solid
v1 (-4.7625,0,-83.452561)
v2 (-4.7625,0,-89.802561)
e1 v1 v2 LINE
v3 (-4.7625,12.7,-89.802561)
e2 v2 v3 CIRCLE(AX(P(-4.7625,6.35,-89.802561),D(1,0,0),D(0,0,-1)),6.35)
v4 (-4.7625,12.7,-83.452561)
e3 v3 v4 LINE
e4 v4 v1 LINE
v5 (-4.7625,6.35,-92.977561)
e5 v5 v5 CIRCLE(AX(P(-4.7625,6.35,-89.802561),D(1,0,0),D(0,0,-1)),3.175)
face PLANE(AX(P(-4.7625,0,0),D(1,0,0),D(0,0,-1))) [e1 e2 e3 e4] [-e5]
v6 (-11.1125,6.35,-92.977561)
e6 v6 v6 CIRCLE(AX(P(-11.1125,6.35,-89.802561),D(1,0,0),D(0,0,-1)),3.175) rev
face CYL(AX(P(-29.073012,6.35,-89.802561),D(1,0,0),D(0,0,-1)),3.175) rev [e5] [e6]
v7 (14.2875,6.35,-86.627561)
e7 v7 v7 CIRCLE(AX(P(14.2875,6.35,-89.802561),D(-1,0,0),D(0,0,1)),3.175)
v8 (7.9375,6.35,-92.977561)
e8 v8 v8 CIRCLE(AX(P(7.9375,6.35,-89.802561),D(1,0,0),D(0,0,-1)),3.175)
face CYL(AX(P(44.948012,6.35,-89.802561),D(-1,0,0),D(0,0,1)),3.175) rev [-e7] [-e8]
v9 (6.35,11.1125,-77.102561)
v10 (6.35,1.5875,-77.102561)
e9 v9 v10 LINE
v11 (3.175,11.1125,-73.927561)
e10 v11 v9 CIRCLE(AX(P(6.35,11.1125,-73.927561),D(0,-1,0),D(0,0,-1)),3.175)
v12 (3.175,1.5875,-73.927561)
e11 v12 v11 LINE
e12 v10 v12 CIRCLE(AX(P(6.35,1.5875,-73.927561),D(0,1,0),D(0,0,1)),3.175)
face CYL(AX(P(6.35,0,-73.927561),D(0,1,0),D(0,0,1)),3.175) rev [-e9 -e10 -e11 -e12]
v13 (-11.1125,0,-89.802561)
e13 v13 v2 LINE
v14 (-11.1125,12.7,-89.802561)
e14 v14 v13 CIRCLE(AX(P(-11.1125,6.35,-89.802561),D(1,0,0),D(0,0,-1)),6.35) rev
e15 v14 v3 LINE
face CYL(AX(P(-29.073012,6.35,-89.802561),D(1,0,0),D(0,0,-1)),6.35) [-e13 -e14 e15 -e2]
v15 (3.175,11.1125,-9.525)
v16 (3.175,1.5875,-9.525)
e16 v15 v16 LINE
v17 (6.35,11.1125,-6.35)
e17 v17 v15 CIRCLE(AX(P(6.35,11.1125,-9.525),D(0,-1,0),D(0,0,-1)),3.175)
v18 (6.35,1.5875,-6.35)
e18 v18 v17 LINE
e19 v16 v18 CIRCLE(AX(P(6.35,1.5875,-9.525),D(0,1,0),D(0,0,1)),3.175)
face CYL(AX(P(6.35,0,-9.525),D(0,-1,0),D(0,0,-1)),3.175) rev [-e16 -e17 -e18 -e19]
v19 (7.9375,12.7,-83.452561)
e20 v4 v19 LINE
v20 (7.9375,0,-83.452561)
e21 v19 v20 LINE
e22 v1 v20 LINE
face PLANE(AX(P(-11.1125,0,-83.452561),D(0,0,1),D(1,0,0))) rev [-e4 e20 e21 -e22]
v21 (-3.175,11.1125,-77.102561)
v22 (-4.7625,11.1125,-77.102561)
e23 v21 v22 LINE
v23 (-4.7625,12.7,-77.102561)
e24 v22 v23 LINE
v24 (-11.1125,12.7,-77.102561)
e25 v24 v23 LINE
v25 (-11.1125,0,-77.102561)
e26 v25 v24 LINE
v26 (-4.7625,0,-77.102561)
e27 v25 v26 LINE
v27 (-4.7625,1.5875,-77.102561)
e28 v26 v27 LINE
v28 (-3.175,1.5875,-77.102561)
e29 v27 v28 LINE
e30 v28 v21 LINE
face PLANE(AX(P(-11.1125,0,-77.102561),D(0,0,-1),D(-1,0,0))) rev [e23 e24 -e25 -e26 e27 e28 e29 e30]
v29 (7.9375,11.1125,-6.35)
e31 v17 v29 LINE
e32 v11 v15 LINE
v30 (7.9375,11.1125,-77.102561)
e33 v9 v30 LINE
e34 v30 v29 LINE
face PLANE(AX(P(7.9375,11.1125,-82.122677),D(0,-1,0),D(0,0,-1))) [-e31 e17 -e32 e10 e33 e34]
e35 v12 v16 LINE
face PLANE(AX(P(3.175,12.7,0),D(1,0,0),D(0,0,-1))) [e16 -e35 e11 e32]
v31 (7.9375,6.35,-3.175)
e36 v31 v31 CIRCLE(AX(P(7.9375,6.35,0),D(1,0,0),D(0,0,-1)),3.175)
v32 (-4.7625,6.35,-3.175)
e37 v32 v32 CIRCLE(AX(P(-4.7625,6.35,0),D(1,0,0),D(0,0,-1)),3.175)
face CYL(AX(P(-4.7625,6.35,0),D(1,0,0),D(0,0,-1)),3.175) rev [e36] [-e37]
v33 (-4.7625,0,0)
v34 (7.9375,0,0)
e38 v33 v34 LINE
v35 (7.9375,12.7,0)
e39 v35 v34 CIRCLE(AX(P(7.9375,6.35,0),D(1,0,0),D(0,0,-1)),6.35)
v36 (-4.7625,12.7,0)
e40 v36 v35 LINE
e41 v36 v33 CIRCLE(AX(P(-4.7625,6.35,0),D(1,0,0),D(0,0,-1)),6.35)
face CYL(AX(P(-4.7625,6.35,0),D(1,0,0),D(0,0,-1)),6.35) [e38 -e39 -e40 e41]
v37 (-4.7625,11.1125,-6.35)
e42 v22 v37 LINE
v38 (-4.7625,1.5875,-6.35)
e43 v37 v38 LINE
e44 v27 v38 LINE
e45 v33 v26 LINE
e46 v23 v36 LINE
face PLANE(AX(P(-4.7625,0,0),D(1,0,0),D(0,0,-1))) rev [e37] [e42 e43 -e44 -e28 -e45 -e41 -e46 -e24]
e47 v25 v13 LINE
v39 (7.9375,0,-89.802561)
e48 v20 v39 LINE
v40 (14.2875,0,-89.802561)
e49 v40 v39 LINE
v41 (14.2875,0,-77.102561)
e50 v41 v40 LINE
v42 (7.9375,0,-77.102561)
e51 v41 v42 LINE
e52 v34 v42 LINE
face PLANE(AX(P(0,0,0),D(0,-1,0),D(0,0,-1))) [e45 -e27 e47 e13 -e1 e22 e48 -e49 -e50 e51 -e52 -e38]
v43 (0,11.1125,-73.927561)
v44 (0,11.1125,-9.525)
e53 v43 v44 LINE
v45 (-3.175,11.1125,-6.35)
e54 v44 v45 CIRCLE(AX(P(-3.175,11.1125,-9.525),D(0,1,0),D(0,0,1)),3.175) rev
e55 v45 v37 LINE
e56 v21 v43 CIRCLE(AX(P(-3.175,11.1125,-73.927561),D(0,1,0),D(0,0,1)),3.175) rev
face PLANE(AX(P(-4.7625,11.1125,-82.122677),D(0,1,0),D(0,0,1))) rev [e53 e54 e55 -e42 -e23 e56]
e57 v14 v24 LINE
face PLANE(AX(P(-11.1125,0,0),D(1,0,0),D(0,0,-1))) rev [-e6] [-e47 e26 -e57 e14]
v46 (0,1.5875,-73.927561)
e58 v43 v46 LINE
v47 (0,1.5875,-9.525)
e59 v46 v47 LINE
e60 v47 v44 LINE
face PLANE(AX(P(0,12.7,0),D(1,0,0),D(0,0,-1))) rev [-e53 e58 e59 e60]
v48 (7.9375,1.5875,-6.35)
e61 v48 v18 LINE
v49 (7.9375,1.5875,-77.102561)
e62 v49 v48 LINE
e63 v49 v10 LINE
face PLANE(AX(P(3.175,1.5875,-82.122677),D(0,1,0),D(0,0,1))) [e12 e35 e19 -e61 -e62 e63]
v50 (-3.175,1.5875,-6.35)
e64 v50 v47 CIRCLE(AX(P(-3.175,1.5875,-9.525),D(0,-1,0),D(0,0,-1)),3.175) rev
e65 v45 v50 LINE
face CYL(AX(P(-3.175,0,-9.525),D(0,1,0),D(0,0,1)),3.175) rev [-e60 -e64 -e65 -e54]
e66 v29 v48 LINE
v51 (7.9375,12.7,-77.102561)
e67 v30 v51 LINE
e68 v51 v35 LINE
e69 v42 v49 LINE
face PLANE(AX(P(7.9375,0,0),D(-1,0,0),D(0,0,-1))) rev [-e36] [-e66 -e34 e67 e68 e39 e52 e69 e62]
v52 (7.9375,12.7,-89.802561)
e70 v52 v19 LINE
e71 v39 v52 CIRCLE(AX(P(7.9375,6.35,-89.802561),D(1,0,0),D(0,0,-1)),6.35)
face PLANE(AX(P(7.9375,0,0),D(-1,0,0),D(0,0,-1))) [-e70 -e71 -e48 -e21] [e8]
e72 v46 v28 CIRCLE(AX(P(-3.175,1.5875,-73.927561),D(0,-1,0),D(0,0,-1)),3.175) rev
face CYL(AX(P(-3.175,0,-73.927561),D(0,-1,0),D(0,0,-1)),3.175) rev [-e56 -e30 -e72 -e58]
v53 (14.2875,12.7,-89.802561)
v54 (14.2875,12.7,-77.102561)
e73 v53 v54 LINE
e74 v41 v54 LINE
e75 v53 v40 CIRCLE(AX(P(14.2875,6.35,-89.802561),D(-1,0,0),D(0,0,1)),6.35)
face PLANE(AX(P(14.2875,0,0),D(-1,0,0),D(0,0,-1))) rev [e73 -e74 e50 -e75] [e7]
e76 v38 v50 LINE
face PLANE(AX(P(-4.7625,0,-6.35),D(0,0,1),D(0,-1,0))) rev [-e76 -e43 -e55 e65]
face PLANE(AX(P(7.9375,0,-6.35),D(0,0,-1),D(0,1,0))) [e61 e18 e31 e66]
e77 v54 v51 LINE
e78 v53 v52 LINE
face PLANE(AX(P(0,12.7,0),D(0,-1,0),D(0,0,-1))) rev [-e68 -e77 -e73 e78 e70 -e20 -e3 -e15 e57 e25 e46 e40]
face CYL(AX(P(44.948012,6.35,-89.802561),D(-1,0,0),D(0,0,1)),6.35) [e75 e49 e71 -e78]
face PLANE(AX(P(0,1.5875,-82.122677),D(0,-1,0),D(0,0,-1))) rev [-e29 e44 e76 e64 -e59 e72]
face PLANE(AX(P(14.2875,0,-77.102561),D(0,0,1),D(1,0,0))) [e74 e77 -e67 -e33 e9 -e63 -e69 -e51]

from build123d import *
from build123d.topology import SkipClean

# Parameters (mm, degrees)
SKETCH3_W           = 1.5875
SKETCH3_H           = 89.802561211
BOSS_EXTRUDE2_DEPTH = 12.7
BOSS_EXTRUDE4_DEPTH = 6.35
BOSS_EXTRUDE5_DEPTH = 12.7
BOSS_EXTRUDE6_START = -6.35
BOSS_EXTRUDE6_DEPTH = 6.35
CUT_EXTRUDE1_DEPTH  = 1.5875
SKETCH5_W           = 4.7625
SKETCH5_H           = 1.5875
BOSS_EXTRUDE7_DEPTH = 70.752561211
CUT_EXTRUDE2_DEPTH  = 12.7
FILLET1_R           = 3.175
FILLET2_R           = 3.175


# Read off the part's stored shape, not the designer's step: Mirror3
with BuildPart() as part:
    # Sketch3 → Boss-Extrude2 (new body)
    with BuildSketch(Plane(origin=(0, 0, 0), x_dir=(1, 0, 0), z_dir=(0, 1, 0))):
        with Locations((0.79375, 44.901280606)):
            Rectangle(SKETCH3_W, SKETCH3_H)
    extrude(amount=BOSS_EXTRUDE2_DEPTH)

    # Sketch4 → Boss-Extrude4 (add)
    with BuildSketch(Plane(origin=(1.5875, 0, 0), x_dir=(0, 0, -1), z_dir=(1, 0, 0))):
        with BuildLine():
            ThreePointArc((0, 0), (4.490128061, 1.859871939), (6.35, 6.35))
            ThreePointArc((6.35, 6.35), (4.490128061, 10.840128061), (0, 12.7))
            Line((0, 12.7), (0, 9.525))
            ThreePointArc((0, 9.525), (2.24506403, 8.59506403), (3.175, 6.35))
            ThreePointArc((3.175, 6.35), (2.24506403, 4.10493597), (0, 3.175))
            Line((0, 3.175), (0, 0))
        make_face()
        with BuildLine():
            Line((0, 9.525), (0, 12.7))
            ThreePointArc((0, 12.7), (-6.35, 6.35), (0, 0))
            Line((0, 0), (0, 3.175))
            ThreePointArc((0, 3.175), (-3.175, 6.35), (0, 9.525))
        make_face()
        with BuildLine():
            ThreePointArc((0, 0), (4.490128061, 1.859871939), (6.35, 6.35))
            ThreePointArc((6.35, 6.35), (4.490128061, 10.840128061), (0, 12.7))
            Line((0, 12.7), (0, 9.525))
            ThreePointArc((0, 9.525), (2.24506403, 8.59506403), (3.175, 6.35))
            ThreePointArc((3.175, 6.35), (2.24506403, 4.10493597), (0, 3.175))
            Line((0, 3.175), (0, 0))
        make_face()
        with BuildLine():
            Line((0, 9.525), (0, 12.7))
            ThreePointArc((0, 12.7), (-6.35, 6.35), (0, 0))
            Line((0, 0), (0, 3.175))
            ThreePointArc((0, 3.175), (-3.175, 6.35), (0, 9.525))
        make_face()
        with BuildLine():
            Line((6.35, 0), (6.35, 6.35))
            ThreePointArc((6.35, 6.35), (4.490128061, 1.859871939), (0, 0))
            Line((0, 0), (6.35, 0))
        make_face()
        with BuildLine():
            Line((6.35, 6.35), (6.35, 12.7))
            Line((6.35, 12.7), (0, 12.7))
            ThreePointArc((0, 12.7), (4.490128061, 10.840128061), (6.35, 6.35))
        make_face()
    extrude(amount=-BOSS_EXTRUDE4_DEPTH)

    # Sketch4<6> → Boss-Extrude5 (add)
    with BuildSketch(Plane(origin=(1.5875, 0, 0), x_dir=(0, 0, -1), z_dir=(1, 0, 0))):
        Polygon((83.452561211, 12.7), (77.102561211, 12.7), (77.102561211, 0), (83.452561211, 0), (83.452561211, 6.35), align=None)
    extrude(amount=-BOSS_EXTRUDE5_DEPTH)

    # Sketch4<7> → Boss-Extrude6 (add)
    with BuildSketch(Plane(origin=(1.5875, 0, 0), x_dir=(0, 0, -1), z_dir=(1, 0, 0)).offset(BOSS_EXTRUDE6_START)):
        with BuildLine():
            ThreePointArc((89.802561211, 12.7), (85.31243315, 10.840128061), (83.452561211, 6.35))
            ThreePointArc((83.452561211, 6.35), (85.31243315, 1.859871939), (89.802561211, 0))
            Line((89.802561211, 0), (89.802561211, 3.175))
            ThreePointArc((89.802561211, 3.175), (86.627561211, 6.35), (89.802561211, 9.525))
            Line((89.802561211, 9.525), (89.802561211, 12.7))
        make_face()
        with BuildLine():
            ThreePointArc((96.152561211, 6.35), (94.292689271, 10.840128061), (89.802561211, 12.7))
            Line((89.802561211, 12.7), (89.802561211, 9.525))
            ThreePointArc((89.802561211, 9.525), (92.047625241, 8.59506403), (92.977561211, 6.35))
            ThreePointArc((92.977561211, 6.35), (92.047625241, 4.10493597), (89.802561211, 3.175))
            Line((89.802561211, 3.175), (89.802561211, 0))
            ThreePointArc((89.802561211, 0), (94.292689271, 1.859871939), (96.152561211, 6.35))
        make_face()
        with BuildLine():
            ThreePointArc((89.802561211, 12.7), (85.31243315, 10.840128061), (83.452561211, 6.35))
            ThreePointArc((83.452561211, 6.35), (85.31243315, 1.859871939), (89.802561211, 0))
            Line((89.802561211, 0), (89.802561211, 3.175))
            ThreePointArc((89.802561211, 3.175), (86.627561211, 6.35), (89.802561211, 9.525))
            Line((89.802561211, 9.525), (89.802561211, 12.7))
        make_face()
        with BuildLine():
            ThreePointArc((96.152561211, 6.35), (94.292689271, 10.840128061), (89.802561211, 12.7))
            Line((89.802561211, 12.7), (89.802561211, 9.525))
            ThreePointArc((89.802561211, 9.525), (92.047625241, 8.59506403), (92.977561211, 6.35))
            ThreePointArc((92.977561211, 6.35), (92.047625241, 4.10493597), (89.802561211, 3.175))
            Line((89.802561211, 3.175), (89.802561211, 0))
            ThreePointArc((89.802561211, 0), (94.292689271, 1.859871939), (96.152561211, 6.35))
        make_face()
        with BuildLine():
            ThreePointArc((89.802561211, 0), (85.31243315, 1.859871939), (83.452561211, 6.35))
            Line((83.452561211, 6.35), (83.452561211, 0))
            Line((83.452561211, 0), (89.802561211, 0))
        make_face()
        with BuildLine():
            Line((89.802561211, 12.7), (83.452561211, 12.7))
            Line((83.452561211, 12.7), (83.452561211, 6.35))
            ThreePointArc((83.452561211, 6.35), (85.31243315, 10.840128061), (89.802561211, 12.7))
        make_face()
    extrude(amount=-BOSS_EXTRUDE6_DEPTH)

    # Sketch4<9> → Cut-Extrude1 (cut)
    with BuildSketch(Plane(origin=(1.5875, 0, 0), x_dir=(0, 0, -1), z_dir=(1, 0, 0))):
        with BuildLine():
            ThreePointArc((89.802561211, 0), (85.31243315, 1.859871939), (83.452561211, 6.35))
            Line((83.452561211, 6.35), (83.452561211, 0))
            Line((83.452561211, 0), (89.802561211, 0))
        make_face()
        with BuildLine():
            ThreePointArc((89.802561211, 12.7), (85.31243315, 10.840128061), (83.452561211, 6.35))
            ThreePointArc((83.452561211, 6.35), (85.31243315, 1.859871939), (89.802561211, 0))
            Line((89.802561211, 0), (89.802561211, 3.175))
            ThreePointArc((89.802561211, 3.175), (86.627561211, 6.35), (89.802561211, 9.525))
            Line((89.802561211, 9.525), (89.802561211, 12.7))
        make_face()
        with BuildLine():
            ThreePointArc((96.152561211, 6.35), (94.292689271, 10.840128061), (89.802561211, 12.7))
            Line((89.802561211, 12.7), (89.802561211, 9.525))
            ThreePointArc((89.802561211, 9.525), (92.047625241, 8.59506403), (92.977561211, 6.35))
            ThreePointArc((92.977561211, 6.35), (92.047625241, 4.10493597), (89.802561211, 3.175))
            Line((89.802561211, 3.175), (89.802561211, 0))
            ThreePointArc((89.802561211, 0), (94.292689271, 1.859871939), (96.152561211, 6.35))
        make_face()
        with BuildLine():
            Line((89.802561211, 12.7), (83.452561211, 12.7))
            Line((83.452561211, 12.7), (83.452561211, 6.35))
            ThreePointArc((83.452561211, 6.35), (85.31243315, 10.840128061), (89.802561211, 12.7))
        make_face()
    extrude(amount=-CUT_EXTRUDE1_DEPTH, mode=Mode.SUBTRACT)


with BuildPart() as cut_extrude1_kept_piece:
    # of the separate pieces the step leaves, the one the design keeps (cut_extrude1_pieces_kept)
    add(part.part.solids().sort_by_distance((1.5875, 0, 0))[0])

    # Sketch5 → Boss-Extrude7 (add)
    with BuildSketch(Plane(origin=(0, 0, -6.35), x_dir=(-1, 0, 0), z_dir=(0, 0, -1))):
        with Locations((2.38125, 11.90625)):
            Rectangle(SKETCH5_W, SKETCH5_H)
        with Locations((2.38125, 0.79375)):
            Rectangle(SKETCH5_W, SKETCH5_H)
    extrude(amount=BOSS_EXTRUDE7_DEPTH)

    # Sketch4<10> → Cut-Extrude2 (cut)
    with SkipClean():  # the faces are left unmerged after this step: merging them gives an invalid solid
        with BuildSketch(Plane(origin=(1.5875, 0, 0), x_dir=(0, 0, -1), z_dir=(1, 0, 0))):
            with BuildLine():
                ThreePointArc((3.175, 6.35), (2.24506403, 8.59506403), (0, 9.525))
                Line((0, 9.525), (0, 3.175))
                ThreePointArc((0, 3.175), (2.24506403, 4.10493597), (3.175, 6.35))
            make_face()
            with BuildLine():
                Line((0, 3.175), (0, 9.525))
                ThreePointArc((0, 9.525), (-3.175, 6.35), (0, 3.175))
            make_face()
        extrude(amount=-CUT_EXTRUDE2_DEPTH, mode=Mode.SUBTRACT)

    # Fillet1
    fillet1_edges = [cut_extrude1_kept_piece.edges().sort_by_distance(p)[0] for p in [
        (0, 6.35, -77.102561211),
    ]]
    fillet(fillet1_edges, radius=FILLET1_R)

    # Fillet2
    fillet2_edges = [cut_extrude1_kept_piece.edges().sort_by_distance(p)[0] for p in [
        (0, 6.35, -6.35),
    ]]
    fillet(fillet2_edges, radius=FILLET2_R)

    # Mirror3: Cut-Extrude1 kept piece across plane


with BuildPart() as cut_extrude1_kept_piece_1:
    with SkipClean():  # the faces are left unmerged after this step: merging them gives an invalid solid
        add(cut_extrude1_kept_piece.part)
        add(cut_extrude1_kept_piece.part.mirror(Plane(origin=(1.5875, 0, 0), x_dir=(0, 0, 1), z_dir=(1, 0, 0))))


solid = cut_extrude1_kept_piece_1.part
